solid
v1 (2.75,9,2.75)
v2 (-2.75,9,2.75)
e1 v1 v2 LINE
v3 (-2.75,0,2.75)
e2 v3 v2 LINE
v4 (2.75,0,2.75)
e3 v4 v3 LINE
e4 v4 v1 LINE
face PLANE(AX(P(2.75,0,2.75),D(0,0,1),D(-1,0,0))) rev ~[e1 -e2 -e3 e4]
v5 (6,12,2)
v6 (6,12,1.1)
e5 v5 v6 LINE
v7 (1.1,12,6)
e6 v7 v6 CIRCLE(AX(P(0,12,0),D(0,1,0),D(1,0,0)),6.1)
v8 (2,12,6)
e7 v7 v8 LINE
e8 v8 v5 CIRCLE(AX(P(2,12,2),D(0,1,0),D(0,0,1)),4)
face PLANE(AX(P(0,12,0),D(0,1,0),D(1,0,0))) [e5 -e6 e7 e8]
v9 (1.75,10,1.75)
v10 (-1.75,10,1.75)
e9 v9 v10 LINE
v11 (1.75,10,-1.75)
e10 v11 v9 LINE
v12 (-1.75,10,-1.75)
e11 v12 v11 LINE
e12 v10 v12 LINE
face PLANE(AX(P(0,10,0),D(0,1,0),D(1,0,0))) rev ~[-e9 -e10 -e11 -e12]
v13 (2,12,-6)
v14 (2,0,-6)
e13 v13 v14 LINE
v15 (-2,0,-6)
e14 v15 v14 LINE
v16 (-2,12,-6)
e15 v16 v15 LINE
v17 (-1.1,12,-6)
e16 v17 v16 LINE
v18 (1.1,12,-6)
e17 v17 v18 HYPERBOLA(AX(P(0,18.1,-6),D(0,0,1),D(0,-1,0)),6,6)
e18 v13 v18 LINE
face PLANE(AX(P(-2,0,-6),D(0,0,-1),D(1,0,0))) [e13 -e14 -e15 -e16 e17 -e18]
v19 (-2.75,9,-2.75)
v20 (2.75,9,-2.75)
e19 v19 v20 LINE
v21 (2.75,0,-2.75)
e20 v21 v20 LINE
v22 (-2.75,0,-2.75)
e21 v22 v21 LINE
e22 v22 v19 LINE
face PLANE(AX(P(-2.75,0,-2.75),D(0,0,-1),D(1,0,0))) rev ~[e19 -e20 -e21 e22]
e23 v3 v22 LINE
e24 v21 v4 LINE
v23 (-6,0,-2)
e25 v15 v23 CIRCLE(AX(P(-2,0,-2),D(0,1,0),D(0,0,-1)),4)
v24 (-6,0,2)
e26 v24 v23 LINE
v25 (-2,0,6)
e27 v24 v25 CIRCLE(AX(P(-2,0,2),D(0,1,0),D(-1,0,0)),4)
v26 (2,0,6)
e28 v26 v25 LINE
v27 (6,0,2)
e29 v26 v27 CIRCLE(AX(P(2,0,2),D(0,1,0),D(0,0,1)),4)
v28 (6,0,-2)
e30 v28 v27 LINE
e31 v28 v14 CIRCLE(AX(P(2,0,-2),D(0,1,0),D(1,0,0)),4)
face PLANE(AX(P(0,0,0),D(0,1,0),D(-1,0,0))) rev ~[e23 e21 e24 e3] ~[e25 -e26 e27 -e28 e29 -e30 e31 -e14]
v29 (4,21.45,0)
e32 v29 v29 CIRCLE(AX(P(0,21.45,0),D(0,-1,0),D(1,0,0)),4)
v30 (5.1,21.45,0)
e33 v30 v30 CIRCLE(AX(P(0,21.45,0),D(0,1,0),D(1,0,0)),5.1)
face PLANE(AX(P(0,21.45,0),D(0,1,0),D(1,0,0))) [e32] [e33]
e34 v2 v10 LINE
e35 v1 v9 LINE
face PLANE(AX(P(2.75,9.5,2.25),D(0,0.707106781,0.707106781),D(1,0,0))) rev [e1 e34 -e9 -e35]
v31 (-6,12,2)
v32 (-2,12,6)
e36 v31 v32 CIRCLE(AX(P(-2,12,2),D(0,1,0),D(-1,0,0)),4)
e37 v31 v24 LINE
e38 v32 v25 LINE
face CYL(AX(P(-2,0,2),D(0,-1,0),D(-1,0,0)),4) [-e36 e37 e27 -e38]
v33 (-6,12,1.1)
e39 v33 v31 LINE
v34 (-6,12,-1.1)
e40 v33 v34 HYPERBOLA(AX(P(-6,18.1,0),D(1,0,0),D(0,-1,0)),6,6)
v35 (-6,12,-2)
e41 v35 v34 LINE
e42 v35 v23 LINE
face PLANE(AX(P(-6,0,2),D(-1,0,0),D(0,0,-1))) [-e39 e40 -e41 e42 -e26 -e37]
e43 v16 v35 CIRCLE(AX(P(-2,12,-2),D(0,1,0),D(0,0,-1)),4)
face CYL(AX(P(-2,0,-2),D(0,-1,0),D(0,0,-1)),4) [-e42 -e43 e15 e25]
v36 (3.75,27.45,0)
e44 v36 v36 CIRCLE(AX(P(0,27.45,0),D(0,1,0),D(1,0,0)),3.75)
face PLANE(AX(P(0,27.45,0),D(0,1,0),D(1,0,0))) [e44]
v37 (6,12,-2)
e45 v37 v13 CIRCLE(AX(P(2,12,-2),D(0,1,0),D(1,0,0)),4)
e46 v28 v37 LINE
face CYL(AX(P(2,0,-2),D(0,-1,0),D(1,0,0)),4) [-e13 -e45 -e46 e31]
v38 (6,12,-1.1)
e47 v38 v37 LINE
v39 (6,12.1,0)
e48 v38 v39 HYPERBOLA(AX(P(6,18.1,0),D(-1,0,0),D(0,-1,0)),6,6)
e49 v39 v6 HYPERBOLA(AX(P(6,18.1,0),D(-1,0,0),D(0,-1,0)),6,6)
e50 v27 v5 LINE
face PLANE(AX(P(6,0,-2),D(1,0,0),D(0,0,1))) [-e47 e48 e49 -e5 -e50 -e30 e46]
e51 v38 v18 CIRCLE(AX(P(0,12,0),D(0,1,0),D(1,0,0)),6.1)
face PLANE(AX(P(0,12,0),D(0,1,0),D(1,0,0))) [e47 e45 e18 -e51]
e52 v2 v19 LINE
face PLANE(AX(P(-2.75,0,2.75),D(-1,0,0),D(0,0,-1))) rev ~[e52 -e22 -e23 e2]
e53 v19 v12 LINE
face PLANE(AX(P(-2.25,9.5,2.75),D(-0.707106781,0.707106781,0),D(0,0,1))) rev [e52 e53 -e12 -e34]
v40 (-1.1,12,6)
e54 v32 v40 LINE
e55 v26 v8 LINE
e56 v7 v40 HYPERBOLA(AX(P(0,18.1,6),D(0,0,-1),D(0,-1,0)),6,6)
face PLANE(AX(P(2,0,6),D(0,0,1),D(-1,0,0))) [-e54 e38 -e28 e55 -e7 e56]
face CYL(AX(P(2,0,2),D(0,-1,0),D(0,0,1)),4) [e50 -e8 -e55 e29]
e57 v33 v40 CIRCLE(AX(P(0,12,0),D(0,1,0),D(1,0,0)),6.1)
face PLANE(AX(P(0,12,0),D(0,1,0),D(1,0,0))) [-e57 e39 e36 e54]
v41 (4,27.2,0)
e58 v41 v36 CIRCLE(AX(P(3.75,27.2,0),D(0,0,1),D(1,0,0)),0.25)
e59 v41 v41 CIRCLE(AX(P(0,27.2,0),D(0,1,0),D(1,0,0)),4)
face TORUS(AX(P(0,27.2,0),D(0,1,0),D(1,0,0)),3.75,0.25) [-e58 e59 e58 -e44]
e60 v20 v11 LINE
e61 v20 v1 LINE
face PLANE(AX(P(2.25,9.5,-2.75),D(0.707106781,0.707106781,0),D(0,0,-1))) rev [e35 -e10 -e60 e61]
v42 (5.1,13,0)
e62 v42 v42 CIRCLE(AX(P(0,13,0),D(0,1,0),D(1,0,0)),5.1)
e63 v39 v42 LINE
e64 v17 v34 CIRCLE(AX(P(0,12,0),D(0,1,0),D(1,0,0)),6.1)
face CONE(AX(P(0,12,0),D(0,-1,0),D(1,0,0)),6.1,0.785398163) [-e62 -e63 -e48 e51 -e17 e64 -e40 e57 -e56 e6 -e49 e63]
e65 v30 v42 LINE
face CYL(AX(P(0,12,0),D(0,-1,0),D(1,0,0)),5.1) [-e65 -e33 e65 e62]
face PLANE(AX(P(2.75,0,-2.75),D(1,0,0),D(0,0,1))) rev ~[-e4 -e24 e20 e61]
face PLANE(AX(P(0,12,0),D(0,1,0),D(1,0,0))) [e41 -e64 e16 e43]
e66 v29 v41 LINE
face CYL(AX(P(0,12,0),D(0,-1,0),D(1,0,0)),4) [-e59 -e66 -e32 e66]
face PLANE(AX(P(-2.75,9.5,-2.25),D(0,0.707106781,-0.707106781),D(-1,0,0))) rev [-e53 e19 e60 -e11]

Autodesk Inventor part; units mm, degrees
ref_plane "YZ Plane" through (0, 0, 0) normal (1, 0, 0) x (0, 1, 0)
ref_plane "XZ Plane" through (0, 0, 0) normal (0, 1, 0) x (-1, 0, 0)
ref_plane "XY Plane" through (0, 0, 0) normal (0, 0, 1) x (1, 0, 0)
sketch "Szkic1" plane through (0, 0, 0) normal (0, 1, 0) x (-1, 0, 0)
  line L0 (-2.75, 2.75) -> (2.75, 2.75)
  line L1 (2.75, 2.75) -> (2.75, -2.75)
  line L2 (2.75, -2.75) -> (-2.75, -2.75)
  line L3 (-2.75, -2.75) -> (-2.75, 2.75)
  line L4 (-2.75, 2.75) -> (2.75, -2.75) construction
  line L5 (2.75, 2.75) -> (-2.75, -2.75) construction
  line L6 (-2, 6) -> (2, 6)
  line L7 (6, 2) -> (6, -2)
  line L8 (2, -6) -> (-2, -6)
  line L9 (-6, -2) -> (-6, 2)
  line L10 (-6, 6) -> (6, -6) construction
  line L11 (6, 6) -> (-6, -6) construction
  arc A0 (6, 2) -> (2, 6) centre (2, 2) ccw
  arc A1 (2, -6) -> (6, -2) centre (2, -2) ccw
  arc A2 (-6, -2) -> (-2, -6) centre (-2, -2) ccw
  arc A3 (-2, 6) -> (-6, 2) centre (-2, 2) ccw
  point P0 (0, 0)
  dimension "d0" = 5.5
  dimension "d1" = 12
  dimension "d2" = 4
extrude "Wyciągnięcie proste1" add sketch "Szkic1" along normal blind 10
sketch "Szkic2" plane through (0, 10, 0) normal (0, 1, 0) x (1, 0, 0)
  arc A0 (-6, -2) -> (-2, -6) centre (-2, -2) ccw projected
  line L0 (-6, 2) -> (-6, -2) projected
  arc A1 (-2, 6) -> (-6, 2) centre (-2, 2) ccw projected
  line L1 (2, 6) -> (-2, 6) projected
  arc A2 (6, 2) -> (2, 6) centre (2, 2) ccw projected
  line L2 (6, -2) -> (6, 2) projected
  arc A3 (2, -6) -> (6, -2) centre (2, -2) ccw projected
  line L3 (-2, -6) -> (2, -6) projected
extrude "Wyciągnięcie proste2" add sketch "Szkic2" along normal blind 2
sketch "Szkic3" plane through (0, 12, 0) normal (0, 1, 0) x (1, 0, 0)
  circle A0 centre (0, 0) radius 4
  dimension "d7" = 8
extrude "Wyciągnięcie proste3" add sketch "Szkic3" along normal blind 15.45
sketch "Szkic5" plane through (0, 12, 0) normal (0, 1, 0) x (1, 0, 0)
  circle A0 centre (0, 0) radius 5.1
  dimension "d19" = 10.2
extrude "Wyciągnięcie proste4" add sketch "Szkic5" along normal blind 6.15
fillet "Zaokrąglenie2" radius 0.25 1 edges at (-4, 27.45, 0)
chamfer "Faza1" distance 1 angle 45 4 edges at (-2.75, 10, 0) (0, 10, 2.75) (2.75, 10, 0) (0, 10, -2.75)
sketch "Sketch6" plane through (0, 18.15, 0) normal (0, 1, 0) x (1, 0, 0)
  circle A0 centre (0, 0) radius 5.1 projected
  circle A1 centre (0, 0) radius 4 projected
extrude "Extrusion5" add sketch "Sketch6" along normal blind 3.3 contours A0 | A1
chamfer "Chamfer2" distance 1 angle 45 1 edges at (-5.1, 12, 0)
properties part number "CH_01_0020_servo_shaft_1"
